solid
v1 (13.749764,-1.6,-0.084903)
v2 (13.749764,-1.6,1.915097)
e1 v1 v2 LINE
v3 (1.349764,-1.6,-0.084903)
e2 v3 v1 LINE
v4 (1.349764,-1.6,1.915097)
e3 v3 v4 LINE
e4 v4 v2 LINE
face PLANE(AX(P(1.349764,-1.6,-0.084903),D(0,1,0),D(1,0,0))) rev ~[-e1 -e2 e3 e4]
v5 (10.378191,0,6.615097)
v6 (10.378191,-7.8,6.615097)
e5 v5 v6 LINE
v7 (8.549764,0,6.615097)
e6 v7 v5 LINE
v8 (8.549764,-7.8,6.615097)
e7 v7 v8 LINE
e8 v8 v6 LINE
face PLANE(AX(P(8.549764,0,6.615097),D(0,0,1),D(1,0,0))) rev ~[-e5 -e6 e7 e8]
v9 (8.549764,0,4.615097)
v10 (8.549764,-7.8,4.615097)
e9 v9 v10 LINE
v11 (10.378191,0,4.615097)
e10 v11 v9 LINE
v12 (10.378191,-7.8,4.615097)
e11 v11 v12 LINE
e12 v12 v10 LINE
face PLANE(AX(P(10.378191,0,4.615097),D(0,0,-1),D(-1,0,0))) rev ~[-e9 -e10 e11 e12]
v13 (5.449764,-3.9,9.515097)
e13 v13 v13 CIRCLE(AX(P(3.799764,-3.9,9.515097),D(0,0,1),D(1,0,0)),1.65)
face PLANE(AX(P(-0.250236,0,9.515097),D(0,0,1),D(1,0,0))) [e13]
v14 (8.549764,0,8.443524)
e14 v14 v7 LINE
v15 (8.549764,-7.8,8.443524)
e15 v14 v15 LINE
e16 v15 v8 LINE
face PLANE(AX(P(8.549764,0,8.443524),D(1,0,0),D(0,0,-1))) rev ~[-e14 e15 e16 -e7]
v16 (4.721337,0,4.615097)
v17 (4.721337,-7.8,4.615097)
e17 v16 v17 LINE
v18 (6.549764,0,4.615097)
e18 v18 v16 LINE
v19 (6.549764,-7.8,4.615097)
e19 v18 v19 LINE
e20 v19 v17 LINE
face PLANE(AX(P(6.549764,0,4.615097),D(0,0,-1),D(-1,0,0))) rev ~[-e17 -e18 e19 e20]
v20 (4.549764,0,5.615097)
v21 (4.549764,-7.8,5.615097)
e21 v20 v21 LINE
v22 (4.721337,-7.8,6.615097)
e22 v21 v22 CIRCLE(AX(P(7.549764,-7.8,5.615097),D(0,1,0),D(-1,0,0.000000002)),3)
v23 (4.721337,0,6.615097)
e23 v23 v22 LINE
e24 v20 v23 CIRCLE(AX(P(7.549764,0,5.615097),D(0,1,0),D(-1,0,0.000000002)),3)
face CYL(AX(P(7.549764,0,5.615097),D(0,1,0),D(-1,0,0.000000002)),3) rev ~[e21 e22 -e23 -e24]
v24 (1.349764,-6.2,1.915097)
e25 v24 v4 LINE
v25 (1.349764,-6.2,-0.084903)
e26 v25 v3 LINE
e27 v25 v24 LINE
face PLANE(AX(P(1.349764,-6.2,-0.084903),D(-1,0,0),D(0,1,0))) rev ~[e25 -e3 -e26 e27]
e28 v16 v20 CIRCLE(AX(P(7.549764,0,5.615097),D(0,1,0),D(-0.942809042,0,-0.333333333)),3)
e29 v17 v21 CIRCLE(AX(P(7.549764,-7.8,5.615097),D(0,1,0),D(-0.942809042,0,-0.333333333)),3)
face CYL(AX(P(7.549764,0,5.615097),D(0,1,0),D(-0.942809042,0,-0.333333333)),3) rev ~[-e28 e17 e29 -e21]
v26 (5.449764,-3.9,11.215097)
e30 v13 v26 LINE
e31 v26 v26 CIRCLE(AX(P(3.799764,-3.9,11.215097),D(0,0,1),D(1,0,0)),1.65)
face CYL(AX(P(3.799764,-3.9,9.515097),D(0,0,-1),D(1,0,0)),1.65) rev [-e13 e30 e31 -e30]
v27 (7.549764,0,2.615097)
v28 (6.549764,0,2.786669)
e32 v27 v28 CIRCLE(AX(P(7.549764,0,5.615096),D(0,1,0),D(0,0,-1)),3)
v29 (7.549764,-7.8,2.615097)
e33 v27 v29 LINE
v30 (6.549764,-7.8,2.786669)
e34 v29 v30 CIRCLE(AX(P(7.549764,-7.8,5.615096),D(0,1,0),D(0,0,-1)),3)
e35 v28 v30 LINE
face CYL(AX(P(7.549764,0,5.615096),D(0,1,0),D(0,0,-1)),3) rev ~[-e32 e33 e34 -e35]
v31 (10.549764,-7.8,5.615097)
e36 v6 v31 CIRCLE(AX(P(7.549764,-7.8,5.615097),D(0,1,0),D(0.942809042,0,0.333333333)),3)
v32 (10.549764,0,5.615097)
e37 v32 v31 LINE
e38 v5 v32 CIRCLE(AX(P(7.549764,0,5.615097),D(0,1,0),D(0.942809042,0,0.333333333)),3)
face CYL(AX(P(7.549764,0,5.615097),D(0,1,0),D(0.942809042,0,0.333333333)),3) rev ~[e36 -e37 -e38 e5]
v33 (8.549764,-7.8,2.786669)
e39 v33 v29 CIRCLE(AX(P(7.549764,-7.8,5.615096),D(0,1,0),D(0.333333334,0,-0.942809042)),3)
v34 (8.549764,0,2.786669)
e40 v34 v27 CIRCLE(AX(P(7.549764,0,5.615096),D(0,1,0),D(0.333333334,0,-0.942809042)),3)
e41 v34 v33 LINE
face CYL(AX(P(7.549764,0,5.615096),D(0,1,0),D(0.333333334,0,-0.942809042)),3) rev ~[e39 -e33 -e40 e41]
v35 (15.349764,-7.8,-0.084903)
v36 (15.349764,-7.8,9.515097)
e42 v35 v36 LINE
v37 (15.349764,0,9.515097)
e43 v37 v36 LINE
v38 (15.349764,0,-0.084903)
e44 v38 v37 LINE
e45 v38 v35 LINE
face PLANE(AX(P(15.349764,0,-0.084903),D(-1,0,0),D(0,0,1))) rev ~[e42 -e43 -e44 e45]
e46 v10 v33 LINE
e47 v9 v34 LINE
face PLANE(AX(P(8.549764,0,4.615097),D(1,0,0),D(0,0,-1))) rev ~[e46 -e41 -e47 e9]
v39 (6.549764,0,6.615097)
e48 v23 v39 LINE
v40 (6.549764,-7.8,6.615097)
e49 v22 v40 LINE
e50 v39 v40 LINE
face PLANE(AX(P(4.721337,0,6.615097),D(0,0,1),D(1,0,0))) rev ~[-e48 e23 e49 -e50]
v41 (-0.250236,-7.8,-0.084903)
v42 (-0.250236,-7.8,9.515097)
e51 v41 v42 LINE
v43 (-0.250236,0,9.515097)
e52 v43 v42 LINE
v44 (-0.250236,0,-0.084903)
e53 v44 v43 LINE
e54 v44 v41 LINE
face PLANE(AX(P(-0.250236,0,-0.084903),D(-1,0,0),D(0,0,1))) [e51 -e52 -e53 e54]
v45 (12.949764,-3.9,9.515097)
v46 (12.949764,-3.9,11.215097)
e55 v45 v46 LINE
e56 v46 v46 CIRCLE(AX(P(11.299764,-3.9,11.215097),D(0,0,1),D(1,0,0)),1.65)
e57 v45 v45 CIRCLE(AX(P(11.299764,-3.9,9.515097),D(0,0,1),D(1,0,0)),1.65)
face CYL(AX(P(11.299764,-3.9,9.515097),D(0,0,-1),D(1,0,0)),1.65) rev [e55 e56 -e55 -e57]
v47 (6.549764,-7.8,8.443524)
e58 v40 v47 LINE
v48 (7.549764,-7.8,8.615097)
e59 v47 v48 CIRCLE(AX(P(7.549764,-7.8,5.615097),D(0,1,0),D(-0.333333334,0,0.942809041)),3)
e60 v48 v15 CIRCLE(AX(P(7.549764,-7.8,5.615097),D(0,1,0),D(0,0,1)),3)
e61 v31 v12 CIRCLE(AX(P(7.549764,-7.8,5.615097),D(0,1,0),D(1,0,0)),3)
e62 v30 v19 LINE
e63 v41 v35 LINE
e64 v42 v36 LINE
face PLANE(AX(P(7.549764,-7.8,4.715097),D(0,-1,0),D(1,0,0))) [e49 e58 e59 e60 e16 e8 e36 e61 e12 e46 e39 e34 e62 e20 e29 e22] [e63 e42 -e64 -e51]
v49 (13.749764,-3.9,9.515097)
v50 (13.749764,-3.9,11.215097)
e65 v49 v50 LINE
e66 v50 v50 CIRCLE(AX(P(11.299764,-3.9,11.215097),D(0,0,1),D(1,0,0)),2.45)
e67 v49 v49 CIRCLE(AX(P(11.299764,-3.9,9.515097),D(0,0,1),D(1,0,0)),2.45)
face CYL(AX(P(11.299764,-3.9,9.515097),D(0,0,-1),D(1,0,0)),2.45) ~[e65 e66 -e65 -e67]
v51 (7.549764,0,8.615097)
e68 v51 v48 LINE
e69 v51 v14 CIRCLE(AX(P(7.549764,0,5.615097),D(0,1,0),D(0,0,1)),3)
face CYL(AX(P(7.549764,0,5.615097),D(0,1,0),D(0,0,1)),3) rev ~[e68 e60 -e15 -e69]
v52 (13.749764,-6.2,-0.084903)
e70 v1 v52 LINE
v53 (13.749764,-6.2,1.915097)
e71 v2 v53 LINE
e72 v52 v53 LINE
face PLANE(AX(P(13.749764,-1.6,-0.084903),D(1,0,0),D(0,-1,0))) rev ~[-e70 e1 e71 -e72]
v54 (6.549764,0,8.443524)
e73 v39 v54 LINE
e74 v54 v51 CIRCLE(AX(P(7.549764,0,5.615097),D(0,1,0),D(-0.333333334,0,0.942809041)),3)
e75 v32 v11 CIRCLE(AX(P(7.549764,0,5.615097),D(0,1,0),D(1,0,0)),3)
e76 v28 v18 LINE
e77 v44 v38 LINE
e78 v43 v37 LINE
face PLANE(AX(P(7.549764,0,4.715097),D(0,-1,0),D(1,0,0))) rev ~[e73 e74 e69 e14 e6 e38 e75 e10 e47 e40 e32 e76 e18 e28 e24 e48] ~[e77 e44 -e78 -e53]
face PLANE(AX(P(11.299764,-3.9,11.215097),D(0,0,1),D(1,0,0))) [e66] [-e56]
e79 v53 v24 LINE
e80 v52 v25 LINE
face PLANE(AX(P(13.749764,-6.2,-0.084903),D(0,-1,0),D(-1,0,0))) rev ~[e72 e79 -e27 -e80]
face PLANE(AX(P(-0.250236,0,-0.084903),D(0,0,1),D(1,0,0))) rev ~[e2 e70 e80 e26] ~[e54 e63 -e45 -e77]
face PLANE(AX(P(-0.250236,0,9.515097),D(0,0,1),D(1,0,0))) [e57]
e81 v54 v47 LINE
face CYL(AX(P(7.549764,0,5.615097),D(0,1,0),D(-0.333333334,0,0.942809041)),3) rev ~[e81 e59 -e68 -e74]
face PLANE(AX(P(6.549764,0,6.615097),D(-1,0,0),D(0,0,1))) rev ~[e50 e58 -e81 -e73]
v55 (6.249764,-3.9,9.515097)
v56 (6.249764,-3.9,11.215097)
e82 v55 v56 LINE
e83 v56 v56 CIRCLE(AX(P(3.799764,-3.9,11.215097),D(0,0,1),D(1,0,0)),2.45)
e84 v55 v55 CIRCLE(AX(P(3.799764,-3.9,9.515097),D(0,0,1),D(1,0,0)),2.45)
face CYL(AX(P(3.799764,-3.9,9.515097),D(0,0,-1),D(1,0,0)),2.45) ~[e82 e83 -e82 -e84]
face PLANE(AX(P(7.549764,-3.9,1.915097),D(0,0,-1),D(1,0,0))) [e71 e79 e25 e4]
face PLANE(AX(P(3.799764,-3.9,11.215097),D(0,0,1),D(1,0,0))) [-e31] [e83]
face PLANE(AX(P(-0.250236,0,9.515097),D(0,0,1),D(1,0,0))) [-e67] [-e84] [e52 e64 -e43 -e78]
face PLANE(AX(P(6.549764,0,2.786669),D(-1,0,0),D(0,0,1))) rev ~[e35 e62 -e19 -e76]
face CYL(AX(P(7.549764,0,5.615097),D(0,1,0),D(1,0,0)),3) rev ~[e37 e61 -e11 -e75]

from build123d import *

# Parameters (mm, degrees)
F0_W     = 15.6
F0_H     = 9.6
F1_DEPTH = 7.8
F2_R     = 2.45
F2_R_2   = 1.65
F3_DEPTH = 1.7
F5_DEPTH = 2


# Not quite as in the source:
# - a feature names something its author has since deleted; it is built from what else it names


with BuildPart() as f1:
    # F0 (on Front) → F1 (new body)
    with BuildSketch(Plane.XZ):
        with Locations((7.5497636572, 4.7150965011)):
            Rectangle(F0_W, F0_H)
        with BuildLine():
            Line((10.5497636572, 6.6150965011), (10.5497636572, 5.6150965011))
            Line((10.5497636572, 5.6150965011), (10.5497636572, 4.6150965011))
            Line((10.5497636572, 4.6150965011), (10.3781907819, 4.6150965011))
            ThreePointArc((10.3781907819, 4.6150965011), (9.6710840007, 3.4937761575), (8.5497636572, 2.7866693764))
            Line((8.5497636572, 2.7866693764), (8.5497636572, 2.6150965011))
            Line((8.5497636572, 2.6150965011), (7.5497636572, 2.6150965011))
            Line((7.5497636572, 2.6150965011), (6.5497636572, 2.6150965011))
            Line((6.5497636572, 2.6150965011), (6.5497636572, 2.7866693764))
            ThreePointArc((6.5497636572, 2.7866693764), (5.4284433136, 3.4937761575), (4.7213365324, 4.6150965011))
            Line((4.7213365324, 4.6150965011), (4.5497636572, 4.6150965011))
            Line((4.5497636572, 4.6150965011), (4.5497636572, 5.6150965067))
            Line((4.5497636572, 5.6150965067), (4.5497636572, 6.6150965011))
            Line((4.5497636572, 6.6150965011), (4.7213365324, 6.6150965011))
            ThreePointArc((4.7213365324, 6.6150965011), (5.4284433136, 7.7364168447), (6.5497636572, 8.4435236258))
            Line((6.5497636572, 8.4435236258), (6.5497636572, 8.6150965011))
            Line((6.5497636572, 8.6150965011), (7.5497636572, 8.6150965011))
            Line((7.5497636572, 8.6150965011), (8.5497636572, 8.6150965011))
            Line((8.5497636572, 8.6150965011), (8.5497636572, 8.4435236258))
            ThreePointArc((8.5497636572, 8.4435236258), (9.6710840007, 7.7364168447), (10.3781907819, 6.6150965011))
            Line((10.3781907819, 6.6150965011), (10.5497636572, 6.6150965011))
        make_face(mode=Mode.SUBTRACT)
        with BuildLine():
            ThreePointArc((8.5497636572, 2.7866693764), (9.6710840007, 3.4937761575), (10.3781907819, 4.6150965011))
            Line((10.3781907819, 4.6150965011), (8.5497636572, 4.6150965011))
            Line((8.5497636572, 4.6150965011), (8.5497636572, 2.7866693764))
        make_face()
        with BuildLine():
            Line((8.5497636572, 6.6150965011), (10.3781907819, 6.6150965011))
            ThreePointArc((10.3781907819, 6.6150965011), (9.6710840007, 7.7364168447), (8.5497636572, 8.4435236258))
            Line((8.5497636572, 8.4435236258), (8.5497636572, 6.6150965011))
        make_face()
        with BuildLine():
            Line((4.7213365324, 6.6150965011), (6.5497636572, 6.6150965011))
            Line((6.5497636572, 6.6150965011), (6.5497636572, 8.4435236258))
            ThreePointArc((6.5497636572, 8.4435236258), (5.4284433136, 7.7364168447), (4.7213365324, 6.6150965011))
        make_face()
        with BuildLine():
            Line((6.5497636572, 2.7866693764), (6.5497636572, 4.6150965011))
            Line((6.5497636572, 4.6150965011), (4.7213365324, 4.6150965011))
            ThreePointArc((4.7213365324, 4.6150965011), (5.4284433136, 3.4937761575), (6.5497636572, 2.7866693764))
        make_face()
        with BuildLine():
            Line((10.5497636572, 4.6150965011), (10.5497636572, 5.6150965011))
            ThreePointArc((10.5497636572, 5.6150965011), (10.5065593361, 5.1077905649), (10.3781907819, 4.6150965011))
            Line((10.3781907819, 4.6150965011), (10.5497636572, 4.6150965011))
        make_face()
        with BuildLine():
            ThreePointArc((10.3781907819, 6.6150965011), (10.5065593361, 6.1224024373), (10.5497636572, 5.6150965011))
            Line((10.5497636572, 5.6150965011), (10.5497636572, 6.6150965011))
            Line((10.5497636572, 6.6150965011), (10.3781907819, 6.6150965011))
        make_face()
        with BuildLine():
            ThreePointArc((7.5497636572, 8.6150965011), (8.0570695933, 8.5718921801), (8.5497636572, 8.4435236258))
            Line((8.5497636572, 8.4435236258), (8.5497636572, 8.6150965011))
            Line((8.5497636572, 8.6150965011), (7.5497636572, 8.6150965011))
        make_face()
        with BuildLine():
            ThreePointArc((6.5497636572, 8.4435236258), (7.042457721, 8.5718921801), (7.5497636572, 8.6150965011))
            Line((7.5497636572, 8.6150965011), (6.5497636572, 8.6150965011))
            Line((6.5497636572, 8.6150965011), (6.5497636572, 8.4435236258))
        make_face()
        with BuildLine():
            ThreePointArc((4.5497636572, 5.6150965067), (4.5929679787, 6.12240244), (4.7213365324, 6.6150965011))
            Line((4.7213365324, 6.6150965011), (4.5497636572, 6.6150965011))
            Line((4.5497636572, 6.6150965011), (4.5497636572, 5.6150965067))
        make_face()
        with BuildLine():
            Line((4.5497636572, 4.6150965011), (4.7213365324, 4.6150965011))
            ThreePointArc((4.7213365324, 4.6150965011), (4.5929679777, 5.1077905677), (4.5497636572, 5.6150965067))
            Line((4.5497636572, 5.6150965067), (4.5497636572, 4.6150965011))
        make_face()
        with BuildLine():
            Line((6.5497636572, 2.6150965011), (7.5497636572, 2.6150965011))
            ThreePointArc((7.5497636572, 2.6150965011), (7.042457721, 2.6583008221), (6.5497636572, 2.7866693764))
            Line((6.5497636572, 2.7866693764), (6.5497636572, 2.6150965011))
        make_face()
        with BuildLine():
            Line((8.5497636572, 2.6150965011), (8.5497636572, 2.7866693764))
            ThreePointArc((8.5497636572, 2.7866693764), (8.0570695933, 2.6583008221), (7.5497636572, 2.6150965011))
            Line((7.5497636572, 2.6150965011), (8.5497636572, 2.6150965011))
        make_face()
    extrude(amount=F1_DEPTH)

    # F2 (on face) → F3 (join)
    with BuildSketch(Plane.XY.offset(9.5150965011)):
        with Locations((3.7997636572, -3.9)):
            Circle(F2_R)
        with Locations((3.7997636572, -3.9)):
            Circle(F2_R_2, mode=Mode.SUBTRACT)
        with Locations((11.2997636572, -3.9)):
            Circle(F2_R)
        with Locations((11.2997636572, -3.9)):
            Circle(F2_R_2, mode=Mode.SUBTRACT)
    extrude(amount=F3_DEPTH)

    # F4 (on face) → F5 (cut)
    with BuildSketch(Plane(origin=(0, 0, -0.0849034989), x_dir=(1, 0, 0), z_dir=(0, 0, -1))):
        Polygon((1.3497636572, 6.2), (1.3497636572, 3.9), (1.3497636572, 1.6), (7.5497636572, 1.6), (13.7497636572, 1.6), (13.7497636572, 3.9), (13.7497636572, 6.2), (7.5497636572, 6.2), align=None)
    extrude(amount=-F5_DEPTH, mode=Mode.SUBTRACT)


solid = f1.part
